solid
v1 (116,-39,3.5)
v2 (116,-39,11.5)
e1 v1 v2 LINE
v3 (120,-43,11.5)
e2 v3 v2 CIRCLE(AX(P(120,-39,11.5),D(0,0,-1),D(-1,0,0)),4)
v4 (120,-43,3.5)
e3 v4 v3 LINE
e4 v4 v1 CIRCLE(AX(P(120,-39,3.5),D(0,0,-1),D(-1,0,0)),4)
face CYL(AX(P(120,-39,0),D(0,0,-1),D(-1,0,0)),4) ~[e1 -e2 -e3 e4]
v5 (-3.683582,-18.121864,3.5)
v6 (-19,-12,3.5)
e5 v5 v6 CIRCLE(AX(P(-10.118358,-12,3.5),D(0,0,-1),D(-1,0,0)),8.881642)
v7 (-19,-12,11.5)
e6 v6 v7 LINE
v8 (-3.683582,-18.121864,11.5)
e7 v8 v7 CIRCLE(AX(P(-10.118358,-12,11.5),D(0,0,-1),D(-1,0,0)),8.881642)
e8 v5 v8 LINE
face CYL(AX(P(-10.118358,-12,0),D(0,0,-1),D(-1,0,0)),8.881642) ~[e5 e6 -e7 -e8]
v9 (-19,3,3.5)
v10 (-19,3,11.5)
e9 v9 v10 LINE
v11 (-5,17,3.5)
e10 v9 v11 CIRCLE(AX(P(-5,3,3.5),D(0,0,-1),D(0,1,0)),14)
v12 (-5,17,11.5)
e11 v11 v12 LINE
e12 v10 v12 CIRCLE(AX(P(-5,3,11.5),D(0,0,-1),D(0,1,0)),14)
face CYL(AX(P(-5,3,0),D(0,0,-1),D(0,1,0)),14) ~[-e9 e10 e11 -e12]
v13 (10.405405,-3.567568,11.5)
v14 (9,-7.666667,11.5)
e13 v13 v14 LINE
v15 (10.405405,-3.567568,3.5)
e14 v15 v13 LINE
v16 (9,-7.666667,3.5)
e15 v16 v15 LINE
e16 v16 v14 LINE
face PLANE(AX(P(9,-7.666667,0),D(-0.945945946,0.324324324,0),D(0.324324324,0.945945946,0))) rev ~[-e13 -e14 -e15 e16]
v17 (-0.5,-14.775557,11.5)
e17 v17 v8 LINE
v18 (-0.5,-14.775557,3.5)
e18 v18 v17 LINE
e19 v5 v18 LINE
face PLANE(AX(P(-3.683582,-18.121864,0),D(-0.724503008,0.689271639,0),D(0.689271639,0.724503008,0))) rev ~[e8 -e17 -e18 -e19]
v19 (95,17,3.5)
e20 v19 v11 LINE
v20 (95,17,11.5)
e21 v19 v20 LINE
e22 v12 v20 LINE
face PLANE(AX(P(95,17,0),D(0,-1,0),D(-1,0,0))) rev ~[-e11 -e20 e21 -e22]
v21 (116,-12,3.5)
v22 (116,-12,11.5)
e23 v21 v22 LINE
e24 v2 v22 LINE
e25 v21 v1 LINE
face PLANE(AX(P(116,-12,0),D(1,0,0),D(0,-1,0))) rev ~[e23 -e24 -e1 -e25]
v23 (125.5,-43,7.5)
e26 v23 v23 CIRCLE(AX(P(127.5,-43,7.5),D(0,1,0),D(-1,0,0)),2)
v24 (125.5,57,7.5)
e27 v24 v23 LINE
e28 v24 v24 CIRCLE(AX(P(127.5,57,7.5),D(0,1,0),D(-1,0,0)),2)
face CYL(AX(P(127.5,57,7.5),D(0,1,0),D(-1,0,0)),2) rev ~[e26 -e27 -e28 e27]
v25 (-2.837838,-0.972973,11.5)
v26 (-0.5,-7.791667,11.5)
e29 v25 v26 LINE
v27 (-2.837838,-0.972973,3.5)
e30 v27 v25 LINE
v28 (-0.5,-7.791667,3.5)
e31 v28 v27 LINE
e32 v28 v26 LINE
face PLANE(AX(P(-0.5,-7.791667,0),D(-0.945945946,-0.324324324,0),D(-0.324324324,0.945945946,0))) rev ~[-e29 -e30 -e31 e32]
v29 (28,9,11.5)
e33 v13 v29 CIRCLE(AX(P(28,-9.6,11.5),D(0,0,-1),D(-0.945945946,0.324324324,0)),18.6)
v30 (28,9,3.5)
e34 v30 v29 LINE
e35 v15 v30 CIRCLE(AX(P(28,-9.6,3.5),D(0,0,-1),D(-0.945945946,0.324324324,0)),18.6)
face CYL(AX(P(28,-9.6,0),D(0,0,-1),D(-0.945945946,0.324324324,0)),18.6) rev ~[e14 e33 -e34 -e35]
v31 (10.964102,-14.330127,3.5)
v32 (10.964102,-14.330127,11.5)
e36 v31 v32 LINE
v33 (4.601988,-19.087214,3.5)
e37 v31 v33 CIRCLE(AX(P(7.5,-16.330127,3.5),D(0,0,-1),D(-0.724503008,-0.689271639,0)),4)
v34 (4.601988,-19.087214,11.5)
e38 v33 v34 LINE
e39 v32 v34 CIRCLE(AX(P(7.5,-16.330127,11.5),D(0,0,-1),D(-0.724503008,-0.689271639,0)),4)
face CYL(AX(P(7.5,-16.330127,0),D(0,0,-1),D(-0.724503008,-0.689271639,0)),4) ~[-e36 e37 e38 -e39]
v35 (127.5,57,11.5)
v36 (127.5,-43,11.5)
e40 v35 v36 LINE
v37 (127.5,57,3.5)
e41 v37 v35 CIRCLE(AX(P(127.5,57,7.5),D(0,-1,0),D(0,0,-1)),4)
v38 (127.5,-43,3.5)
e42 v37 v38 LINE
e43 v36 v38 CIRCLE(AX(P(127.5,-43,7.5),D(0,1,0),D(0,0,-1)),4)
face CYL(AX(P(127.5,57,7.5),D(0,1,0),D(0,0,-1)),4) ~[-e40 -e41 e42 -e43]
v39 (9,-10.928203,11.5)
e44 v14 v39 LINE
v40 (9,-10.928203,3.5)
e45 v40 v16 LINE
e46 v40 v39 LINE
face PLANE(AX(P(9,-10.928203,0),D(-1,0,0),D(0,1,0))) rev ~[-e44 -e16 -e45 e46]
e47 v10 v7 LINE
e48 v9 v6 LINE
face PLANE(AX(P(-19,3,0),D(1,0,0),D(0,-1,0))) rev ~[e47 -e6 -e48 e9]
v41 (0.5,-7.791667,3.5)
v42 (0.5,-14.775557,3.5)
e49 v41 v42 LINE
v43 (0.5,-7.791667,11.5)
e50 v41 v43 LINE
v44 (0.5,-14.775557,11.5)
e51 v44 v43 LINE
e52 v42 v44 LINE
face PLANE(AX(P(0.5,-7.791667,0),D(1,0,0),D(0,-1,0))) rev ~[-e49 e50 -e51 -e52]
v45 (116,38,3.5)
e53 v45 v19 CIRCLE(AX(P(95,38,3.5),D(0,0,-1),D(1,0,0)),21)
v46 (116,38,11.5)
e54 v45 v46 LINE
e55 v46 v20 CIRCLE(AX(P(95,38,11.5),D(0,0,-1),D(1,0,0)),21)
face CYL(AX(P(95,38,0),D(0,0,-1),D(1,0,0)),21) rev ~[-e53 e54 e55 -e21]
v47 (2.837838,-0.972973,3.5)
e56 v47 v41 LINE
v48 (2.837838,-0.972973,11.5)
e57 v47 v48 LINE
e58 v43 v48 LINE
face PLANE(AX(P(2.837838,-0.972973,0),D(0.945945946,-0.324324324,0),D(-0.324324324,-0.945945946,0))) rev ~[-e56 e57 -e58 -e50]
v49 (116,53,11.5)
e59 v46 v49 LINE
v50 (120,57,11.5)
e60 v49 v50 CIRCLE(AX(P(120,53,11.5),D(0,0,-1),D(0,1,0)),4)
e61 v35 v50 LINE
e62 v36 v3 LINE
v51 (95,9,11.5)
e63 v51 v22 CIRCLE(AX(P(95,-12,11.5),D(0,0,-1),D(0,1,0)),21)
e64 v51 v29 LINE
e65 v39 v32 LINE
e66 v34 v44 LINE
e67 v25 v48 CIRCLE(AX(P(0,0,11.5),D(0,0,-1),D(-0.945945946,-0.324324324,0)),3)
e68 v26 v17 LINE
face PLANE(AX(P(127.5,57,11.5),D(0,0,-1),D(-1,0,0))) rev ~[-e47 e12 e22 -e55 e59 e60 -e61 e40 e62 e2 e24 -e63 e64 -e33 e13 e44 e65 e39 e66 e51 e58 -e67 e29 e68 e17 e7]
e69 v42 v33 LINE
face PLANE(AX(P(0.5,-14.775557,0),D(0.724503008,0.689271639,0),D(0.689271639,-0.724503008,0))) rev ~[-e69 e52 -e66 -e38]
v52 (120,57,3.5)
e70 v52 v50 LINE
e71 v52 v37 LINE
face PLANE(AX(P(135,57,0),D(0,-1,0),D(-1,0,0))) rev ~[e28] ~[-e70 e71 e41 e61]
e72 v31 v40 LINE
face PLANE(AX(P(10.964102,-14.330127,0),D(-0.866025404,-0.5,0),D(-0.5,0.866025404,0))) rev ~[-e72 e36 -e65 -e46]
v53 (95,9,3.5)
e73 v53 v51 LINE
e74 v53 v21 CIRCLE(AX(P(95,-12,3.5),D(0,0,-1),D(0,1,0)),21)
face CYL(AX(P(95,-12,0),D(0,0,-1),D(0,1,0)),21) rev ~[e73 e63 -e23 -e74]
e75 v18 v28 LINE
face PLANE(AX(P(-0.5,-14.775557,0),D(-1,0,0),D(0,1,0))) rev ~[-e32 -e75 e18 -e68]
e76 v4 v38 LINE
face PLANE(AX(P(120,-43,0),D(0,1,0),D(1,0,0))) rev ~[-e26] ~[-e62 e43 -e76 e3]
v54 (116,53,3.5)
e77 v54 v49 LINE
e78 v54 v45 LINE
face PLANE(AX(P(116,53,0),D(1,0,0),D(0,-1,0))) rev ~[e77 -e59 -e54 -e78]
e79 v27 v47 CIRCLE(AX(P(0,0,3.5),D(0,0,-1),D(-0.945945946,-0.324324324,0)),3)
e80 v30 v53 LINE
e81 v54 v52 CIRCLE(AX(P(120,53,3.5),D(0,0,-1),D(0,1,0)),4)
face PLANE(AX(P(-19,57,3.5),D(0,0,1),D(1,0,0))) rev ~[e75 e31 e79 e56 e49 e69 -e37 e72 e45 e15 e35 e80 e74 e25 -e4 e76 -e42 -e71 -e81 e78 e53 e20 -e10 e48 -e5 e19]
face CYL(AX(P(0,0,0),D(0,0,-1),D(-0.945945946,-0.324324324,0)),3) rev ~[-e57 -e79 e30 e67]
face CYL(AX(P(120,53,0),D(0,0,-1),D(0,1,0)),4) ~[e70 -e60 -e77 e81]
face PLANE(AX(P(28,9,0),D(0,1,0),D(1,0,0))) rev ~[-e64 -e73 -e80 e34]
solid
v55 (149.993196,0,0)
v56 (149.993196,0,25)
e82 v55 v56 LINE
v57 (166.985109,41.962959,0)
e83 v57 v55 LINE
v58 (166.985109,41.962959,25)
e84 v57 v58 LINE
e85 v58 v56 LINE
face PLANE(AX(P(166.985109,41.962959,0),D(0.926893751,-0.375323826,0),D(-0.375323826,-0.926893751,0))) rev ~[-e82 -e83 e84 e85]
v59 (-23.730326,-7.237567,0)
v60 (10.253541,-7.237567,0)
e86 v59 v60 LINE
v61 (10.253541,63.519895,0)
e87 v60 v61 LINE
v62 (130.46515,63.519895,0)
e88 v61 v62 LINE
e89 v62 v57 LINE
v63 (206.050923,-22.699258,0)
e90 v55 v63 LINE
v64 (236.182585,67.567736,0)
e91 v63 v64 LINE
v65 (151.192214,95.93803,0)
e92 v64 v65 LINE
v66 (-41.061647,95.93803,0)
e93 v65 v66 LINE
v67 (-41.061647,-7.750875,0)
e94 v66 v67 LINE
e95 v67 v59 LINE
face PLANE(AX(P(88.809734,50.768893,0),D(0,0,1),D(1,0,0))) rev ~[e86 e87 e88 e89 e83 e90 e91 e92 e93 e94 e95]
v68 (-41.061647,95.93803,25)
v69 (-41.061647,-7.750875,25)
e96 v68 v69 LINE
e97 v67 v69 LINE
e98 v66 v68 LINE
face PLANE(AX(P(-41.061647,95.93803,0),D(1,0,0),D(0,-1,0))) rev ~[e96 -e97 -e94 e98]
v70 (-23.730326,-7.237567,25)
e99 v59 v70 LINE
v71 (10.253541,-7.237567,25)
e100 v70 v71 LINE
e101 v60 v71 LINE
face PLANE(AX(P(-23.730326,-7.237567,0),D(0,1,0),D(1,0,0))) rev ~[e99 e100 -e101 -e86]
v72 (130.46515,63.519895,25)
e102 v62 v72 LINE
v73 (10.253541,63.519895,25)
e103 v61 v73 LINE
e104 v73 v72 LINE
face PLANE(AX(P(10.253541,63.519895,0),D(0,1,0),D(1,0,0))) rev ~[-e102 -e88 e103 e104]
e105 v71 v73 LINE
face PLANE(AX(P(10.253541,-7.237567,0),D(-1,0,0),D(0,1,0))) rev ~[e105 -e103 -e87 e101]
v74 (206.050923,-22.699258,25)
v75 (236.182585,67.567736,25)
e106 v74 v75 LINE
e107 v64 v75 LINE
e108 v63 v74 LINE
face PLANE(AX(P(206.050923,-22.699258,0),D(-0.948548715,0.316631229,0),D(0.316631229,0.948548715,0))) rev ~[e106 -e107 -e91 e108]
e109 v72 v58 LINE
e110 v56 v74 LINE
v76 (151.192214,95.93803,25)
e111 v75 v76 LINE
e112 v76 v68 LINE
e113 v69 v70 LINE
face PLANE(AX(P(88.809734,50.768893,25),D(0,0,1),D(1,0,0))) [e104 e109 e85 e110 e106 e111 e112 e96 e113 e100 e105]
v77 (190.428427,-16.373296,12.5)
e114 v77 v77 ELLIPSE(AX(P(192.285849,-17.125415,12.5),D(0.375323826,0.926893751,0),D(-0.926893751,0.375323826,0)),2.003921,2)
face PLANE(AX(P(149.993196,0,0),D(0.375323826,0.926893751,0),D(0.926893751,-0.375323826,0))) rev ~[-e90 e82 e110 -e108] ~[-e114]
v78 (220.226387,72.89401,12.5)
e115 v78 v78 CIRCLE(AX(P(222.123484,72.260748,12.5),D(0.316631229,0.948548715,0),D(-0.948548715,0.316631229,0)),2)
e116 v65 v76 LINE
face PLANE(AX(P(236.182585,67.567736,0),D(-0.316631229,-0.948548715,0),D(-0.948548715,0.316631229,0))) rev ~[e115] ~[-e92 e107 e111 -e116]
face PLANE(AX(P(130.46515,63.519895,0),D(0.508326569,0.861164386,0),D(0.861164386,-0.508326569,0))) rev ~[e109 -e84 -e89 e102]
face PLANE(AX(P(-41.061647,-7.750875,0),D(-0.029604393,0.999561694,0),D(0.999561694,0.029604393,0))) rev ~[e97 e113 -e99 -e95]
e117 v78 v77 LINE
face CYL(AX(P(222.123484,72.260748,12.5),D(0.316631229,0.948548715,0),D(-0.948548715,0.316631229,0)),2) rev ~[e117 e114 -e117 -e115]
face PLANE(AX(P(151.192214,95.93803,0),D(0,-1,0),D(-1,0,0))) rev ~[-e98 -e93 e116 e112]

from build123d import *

# Parameters (mm, degrees)
F3_DEPTH  = 25
F4_R      = 2
F5_REACH  = 179.0646776001
F7_DEPTH  = 15
F8_R      = 2
F9_DEPTH  = 100.001
F10_W     = 4
F10_H     = 3.5
F10_W_2   = 21
F10_W_3   = 100
F10_W_4   = 14
F11_DEPTH = 100.001


# Not quite as in the source:
# - the program builds the solid bodies; features that only make, move or delete a surface that nothing else refers to are left out


with BuildPart() as f3:
    # F2 (on Top) → F3 (new body)
    with BuildSketch(Plane.XY):
        Polygon((-41.0616472363, -7.7508748509), (-23.7303264439, -7.237566635), (10.2535411716, -7.237566635), (10.2535411716, 63.5198950768), (130.4651498795, 63.5198950768), (166.9851094484, 41.9629588723), (149.9931961298, 0), (206.0509233637, -22.6992582886), (236.1825853586, 67.5677359104), (151.1922137485, 95.9380297581), (-41.0616472363, 95.9380297581), align=None)
    extrude(amount=F3_DEPTH)

    f5_end = f3.faces().sort_by_distance((178.0220597468, -11.3496291443, 12.5))[0]
    # F4 (on face) → F5 (cut, up to a face of the model that its end follows)
    with BuildSketch(Plane(origin=(43.9718677966, 131.7288218617, 0), x_dir=(-0.9485487152, 0.3166312286, 0), z_dir=(0.3166312286, 0.9485487152, 0))):
        with Locations((-187.8149360418, 12.5)):
            Circle(F4_R)
    f5_long = extrude(amount=-F5_REACH, mode=Mode.PRIVATE)
    add(split(f5_long, bisect_by=f5_end, keep=Keep.BOTTOM, mode=Mode.PRIVATE), mode=Mode.SUBTRACT)


with BuildPart() as f7:
    # F6 (on Top) → F7 (new body)
    with BuildSketch(Plane.XY):
        with BuildLine():
            ThreePointArc((108.5646599662, 17), (106.9006209041, 16.0142040831), (105.1653529206, 15.16))
            ThreePointArc((105.1653529206, 15.16), (118.8306025385, 4.5258095914), (124, -12))
            Line((124, -12), (124, -39))
            ThreePointArc((124, -39), (122.8284271247, -41.8284271247), (120, -43))
            Line((120, -43), (135, -43))
            Line((135, -43), (135, 17))
            Line((135, 17), (124, 17))
            Line((124, 17), (108.5646599662, 17))
        make_face()
        with BuildLine():
            Line((-0.5, -7.7916666667), (-2.8378378378, -0.972972973))
            ThreePointArc((-2.8378378378, -0.972972973), (0, 3), (2.8378378378, -0.972972973))
            Line((2.8378378378, -0.972972973), (0.5, -7.7916666667))
            Line((0.5, -7.7916666667), (0.5, -14.7755569556))
            Line((0.5, -14.7755569556), (4.6019879687, -19.087213573))
            ThreePointArc((4.6019879687, -19.087213573), (9.8953251293, -19.5336278423), (10.9641016151, -14.3301270189))
            Line((10.9641016151, -14.3301270189), (9, -10.9282032303))
            Line((9, -10.9282032303), (9, -7.6666666667))
            Line((9, -7.6666666667), (10.4054054054, -3.5675675676))
            ThreePointArc((10.4054054054, -3.5675675676), (17.1889695968, 5.5354425644), (28, 9))
            Line((28, 9), (95, 9))
            ThreePointArc((95, 9), (109.8492424049, 2.8492424049), (116, -12))
            Line((116, -12), (116, -39))
            ThreePointArc((116, -39), (117.1715728753, -41.8284271247), (120, -43))
            ThreePointArc((120, -43), (122.8284271247, -41.8284271247), (124, -39))
            Line((124, -39), (124, -12))
            ThreePointArc((124, -12), (118.8306025385, 4.5258095914), (105.1653529206, 15.16))
            ThreePointArc((105.1653529206, 15.16), (100.1652686281, 16.5362926814), (95, 17))
            Line((95, 17), (-5, 17))
            ThreePointArc((-5, 17), (-14.8994949366, 12.8994949366), (-19, 3))
            Line((-19, 3), (-19, -12))
            ThreePointArc((-19, -12), (-13.4147336478, -20.247270588), (-3.6835816648, -18.1218639308))
            Line((-3.6835816648, -18.1218639308), (-0.5, -14.7755569556))
            Line((-0.5, -14.7755569556), (-0.5, -7.7916666667))
        make_face()
        with BuildLine():
            ThreePointArc((116, 38), (109.8492424049, 23.1507575951), (95, 17))
            Line((95, 17), (108.5646599662, 17))
            Line((108.5646599662, 17), (124, 17))
            Line((124, 17), (135, 17))
            Line((135, 17), (135, 57))
            Line((135, 57), (120, 57))
            ThreePointArc((120, 57), (117.1715728753, 55.8284271247), (116, 53))
            Line((116, 53), (116, 38))
        make_face()
        with BuildLine():
            Line((108.5646599662, 17), (95, 17))
            ThreePointArc((95, 17), (100.1652686281, 16.5362926814), (105.1653529206, 15.16))
            ThreePointArc((105.1653529206, 15.16), (106.9006209041, 16.0142040831), (108.5646599662, 17))
        make_face()
    extrude(amount=F7_DEPTH)

    # F8 (on face) → F9 (cut, through all)
    with BuildSketch(Plane(origin=(0, 57, 0), x_dir=(-1, 0, 0), z_dir=(0, 1, 0))):
        with Locations((-127.5, 7.5)):
            Circle(F8_R)
    extrude(amount=-F9_DEPTH, mode=Mode.SUBTRACT)

    # F10 (on face) → F11 (cut, through all)
    with BuildSketch(Plane(origin=(0, 57, 0), x_dir=(-1, 0, 0), z_dir=(0, 1, 0))):
        with BuildLine():
            ThreePointArc((-127.5, 3.5), (-131.5, 7.5), (-127.5, 11.5))
            Line((-127.5, 11.5), (-120, 11.5))
            Line((-120, 11.5), (-120, 15))
            Line((-120, 15), (-135, 15))
            Line((-135, 15), (-135, 0))
            Line((-135, 0), (-120, 0))
            Line((-120, 0), (-120, 3.5))
            Line((-120, 3.5), (-127.5, 3.5))
        make_face()
        with Locations((-118, 13.25)):
            Rectangle(F10_W, F10_H)
        with Locations((-105.5, 13.25)):
            Rectangle(F10_W_2, F10_H)
        with Locations((-118, 1.75)):
            Rectangle(F10_W, F10_H)
        with Locations((-105.5, 1.75)):
            Rectangle(F10_W_2, F10_H)
        with Locations((-45, 1.75)):
            Rectangle(F10_W_3, F10_H)
        with Locations((-45, 13.25)):
            Rectangle(F10_W_3, F10_H)
        with Locations((12, 13.25)):
            Rectangle(F10_W_4, F10_H)
        with Locations((12, 1.75)):
            Rectangle(F10_W_4, F10_H)
    extrude(amount=-F11_DEPTH, mode=Mode.SUBTRACT)


solid = Compound([f3.part, f7.part])
